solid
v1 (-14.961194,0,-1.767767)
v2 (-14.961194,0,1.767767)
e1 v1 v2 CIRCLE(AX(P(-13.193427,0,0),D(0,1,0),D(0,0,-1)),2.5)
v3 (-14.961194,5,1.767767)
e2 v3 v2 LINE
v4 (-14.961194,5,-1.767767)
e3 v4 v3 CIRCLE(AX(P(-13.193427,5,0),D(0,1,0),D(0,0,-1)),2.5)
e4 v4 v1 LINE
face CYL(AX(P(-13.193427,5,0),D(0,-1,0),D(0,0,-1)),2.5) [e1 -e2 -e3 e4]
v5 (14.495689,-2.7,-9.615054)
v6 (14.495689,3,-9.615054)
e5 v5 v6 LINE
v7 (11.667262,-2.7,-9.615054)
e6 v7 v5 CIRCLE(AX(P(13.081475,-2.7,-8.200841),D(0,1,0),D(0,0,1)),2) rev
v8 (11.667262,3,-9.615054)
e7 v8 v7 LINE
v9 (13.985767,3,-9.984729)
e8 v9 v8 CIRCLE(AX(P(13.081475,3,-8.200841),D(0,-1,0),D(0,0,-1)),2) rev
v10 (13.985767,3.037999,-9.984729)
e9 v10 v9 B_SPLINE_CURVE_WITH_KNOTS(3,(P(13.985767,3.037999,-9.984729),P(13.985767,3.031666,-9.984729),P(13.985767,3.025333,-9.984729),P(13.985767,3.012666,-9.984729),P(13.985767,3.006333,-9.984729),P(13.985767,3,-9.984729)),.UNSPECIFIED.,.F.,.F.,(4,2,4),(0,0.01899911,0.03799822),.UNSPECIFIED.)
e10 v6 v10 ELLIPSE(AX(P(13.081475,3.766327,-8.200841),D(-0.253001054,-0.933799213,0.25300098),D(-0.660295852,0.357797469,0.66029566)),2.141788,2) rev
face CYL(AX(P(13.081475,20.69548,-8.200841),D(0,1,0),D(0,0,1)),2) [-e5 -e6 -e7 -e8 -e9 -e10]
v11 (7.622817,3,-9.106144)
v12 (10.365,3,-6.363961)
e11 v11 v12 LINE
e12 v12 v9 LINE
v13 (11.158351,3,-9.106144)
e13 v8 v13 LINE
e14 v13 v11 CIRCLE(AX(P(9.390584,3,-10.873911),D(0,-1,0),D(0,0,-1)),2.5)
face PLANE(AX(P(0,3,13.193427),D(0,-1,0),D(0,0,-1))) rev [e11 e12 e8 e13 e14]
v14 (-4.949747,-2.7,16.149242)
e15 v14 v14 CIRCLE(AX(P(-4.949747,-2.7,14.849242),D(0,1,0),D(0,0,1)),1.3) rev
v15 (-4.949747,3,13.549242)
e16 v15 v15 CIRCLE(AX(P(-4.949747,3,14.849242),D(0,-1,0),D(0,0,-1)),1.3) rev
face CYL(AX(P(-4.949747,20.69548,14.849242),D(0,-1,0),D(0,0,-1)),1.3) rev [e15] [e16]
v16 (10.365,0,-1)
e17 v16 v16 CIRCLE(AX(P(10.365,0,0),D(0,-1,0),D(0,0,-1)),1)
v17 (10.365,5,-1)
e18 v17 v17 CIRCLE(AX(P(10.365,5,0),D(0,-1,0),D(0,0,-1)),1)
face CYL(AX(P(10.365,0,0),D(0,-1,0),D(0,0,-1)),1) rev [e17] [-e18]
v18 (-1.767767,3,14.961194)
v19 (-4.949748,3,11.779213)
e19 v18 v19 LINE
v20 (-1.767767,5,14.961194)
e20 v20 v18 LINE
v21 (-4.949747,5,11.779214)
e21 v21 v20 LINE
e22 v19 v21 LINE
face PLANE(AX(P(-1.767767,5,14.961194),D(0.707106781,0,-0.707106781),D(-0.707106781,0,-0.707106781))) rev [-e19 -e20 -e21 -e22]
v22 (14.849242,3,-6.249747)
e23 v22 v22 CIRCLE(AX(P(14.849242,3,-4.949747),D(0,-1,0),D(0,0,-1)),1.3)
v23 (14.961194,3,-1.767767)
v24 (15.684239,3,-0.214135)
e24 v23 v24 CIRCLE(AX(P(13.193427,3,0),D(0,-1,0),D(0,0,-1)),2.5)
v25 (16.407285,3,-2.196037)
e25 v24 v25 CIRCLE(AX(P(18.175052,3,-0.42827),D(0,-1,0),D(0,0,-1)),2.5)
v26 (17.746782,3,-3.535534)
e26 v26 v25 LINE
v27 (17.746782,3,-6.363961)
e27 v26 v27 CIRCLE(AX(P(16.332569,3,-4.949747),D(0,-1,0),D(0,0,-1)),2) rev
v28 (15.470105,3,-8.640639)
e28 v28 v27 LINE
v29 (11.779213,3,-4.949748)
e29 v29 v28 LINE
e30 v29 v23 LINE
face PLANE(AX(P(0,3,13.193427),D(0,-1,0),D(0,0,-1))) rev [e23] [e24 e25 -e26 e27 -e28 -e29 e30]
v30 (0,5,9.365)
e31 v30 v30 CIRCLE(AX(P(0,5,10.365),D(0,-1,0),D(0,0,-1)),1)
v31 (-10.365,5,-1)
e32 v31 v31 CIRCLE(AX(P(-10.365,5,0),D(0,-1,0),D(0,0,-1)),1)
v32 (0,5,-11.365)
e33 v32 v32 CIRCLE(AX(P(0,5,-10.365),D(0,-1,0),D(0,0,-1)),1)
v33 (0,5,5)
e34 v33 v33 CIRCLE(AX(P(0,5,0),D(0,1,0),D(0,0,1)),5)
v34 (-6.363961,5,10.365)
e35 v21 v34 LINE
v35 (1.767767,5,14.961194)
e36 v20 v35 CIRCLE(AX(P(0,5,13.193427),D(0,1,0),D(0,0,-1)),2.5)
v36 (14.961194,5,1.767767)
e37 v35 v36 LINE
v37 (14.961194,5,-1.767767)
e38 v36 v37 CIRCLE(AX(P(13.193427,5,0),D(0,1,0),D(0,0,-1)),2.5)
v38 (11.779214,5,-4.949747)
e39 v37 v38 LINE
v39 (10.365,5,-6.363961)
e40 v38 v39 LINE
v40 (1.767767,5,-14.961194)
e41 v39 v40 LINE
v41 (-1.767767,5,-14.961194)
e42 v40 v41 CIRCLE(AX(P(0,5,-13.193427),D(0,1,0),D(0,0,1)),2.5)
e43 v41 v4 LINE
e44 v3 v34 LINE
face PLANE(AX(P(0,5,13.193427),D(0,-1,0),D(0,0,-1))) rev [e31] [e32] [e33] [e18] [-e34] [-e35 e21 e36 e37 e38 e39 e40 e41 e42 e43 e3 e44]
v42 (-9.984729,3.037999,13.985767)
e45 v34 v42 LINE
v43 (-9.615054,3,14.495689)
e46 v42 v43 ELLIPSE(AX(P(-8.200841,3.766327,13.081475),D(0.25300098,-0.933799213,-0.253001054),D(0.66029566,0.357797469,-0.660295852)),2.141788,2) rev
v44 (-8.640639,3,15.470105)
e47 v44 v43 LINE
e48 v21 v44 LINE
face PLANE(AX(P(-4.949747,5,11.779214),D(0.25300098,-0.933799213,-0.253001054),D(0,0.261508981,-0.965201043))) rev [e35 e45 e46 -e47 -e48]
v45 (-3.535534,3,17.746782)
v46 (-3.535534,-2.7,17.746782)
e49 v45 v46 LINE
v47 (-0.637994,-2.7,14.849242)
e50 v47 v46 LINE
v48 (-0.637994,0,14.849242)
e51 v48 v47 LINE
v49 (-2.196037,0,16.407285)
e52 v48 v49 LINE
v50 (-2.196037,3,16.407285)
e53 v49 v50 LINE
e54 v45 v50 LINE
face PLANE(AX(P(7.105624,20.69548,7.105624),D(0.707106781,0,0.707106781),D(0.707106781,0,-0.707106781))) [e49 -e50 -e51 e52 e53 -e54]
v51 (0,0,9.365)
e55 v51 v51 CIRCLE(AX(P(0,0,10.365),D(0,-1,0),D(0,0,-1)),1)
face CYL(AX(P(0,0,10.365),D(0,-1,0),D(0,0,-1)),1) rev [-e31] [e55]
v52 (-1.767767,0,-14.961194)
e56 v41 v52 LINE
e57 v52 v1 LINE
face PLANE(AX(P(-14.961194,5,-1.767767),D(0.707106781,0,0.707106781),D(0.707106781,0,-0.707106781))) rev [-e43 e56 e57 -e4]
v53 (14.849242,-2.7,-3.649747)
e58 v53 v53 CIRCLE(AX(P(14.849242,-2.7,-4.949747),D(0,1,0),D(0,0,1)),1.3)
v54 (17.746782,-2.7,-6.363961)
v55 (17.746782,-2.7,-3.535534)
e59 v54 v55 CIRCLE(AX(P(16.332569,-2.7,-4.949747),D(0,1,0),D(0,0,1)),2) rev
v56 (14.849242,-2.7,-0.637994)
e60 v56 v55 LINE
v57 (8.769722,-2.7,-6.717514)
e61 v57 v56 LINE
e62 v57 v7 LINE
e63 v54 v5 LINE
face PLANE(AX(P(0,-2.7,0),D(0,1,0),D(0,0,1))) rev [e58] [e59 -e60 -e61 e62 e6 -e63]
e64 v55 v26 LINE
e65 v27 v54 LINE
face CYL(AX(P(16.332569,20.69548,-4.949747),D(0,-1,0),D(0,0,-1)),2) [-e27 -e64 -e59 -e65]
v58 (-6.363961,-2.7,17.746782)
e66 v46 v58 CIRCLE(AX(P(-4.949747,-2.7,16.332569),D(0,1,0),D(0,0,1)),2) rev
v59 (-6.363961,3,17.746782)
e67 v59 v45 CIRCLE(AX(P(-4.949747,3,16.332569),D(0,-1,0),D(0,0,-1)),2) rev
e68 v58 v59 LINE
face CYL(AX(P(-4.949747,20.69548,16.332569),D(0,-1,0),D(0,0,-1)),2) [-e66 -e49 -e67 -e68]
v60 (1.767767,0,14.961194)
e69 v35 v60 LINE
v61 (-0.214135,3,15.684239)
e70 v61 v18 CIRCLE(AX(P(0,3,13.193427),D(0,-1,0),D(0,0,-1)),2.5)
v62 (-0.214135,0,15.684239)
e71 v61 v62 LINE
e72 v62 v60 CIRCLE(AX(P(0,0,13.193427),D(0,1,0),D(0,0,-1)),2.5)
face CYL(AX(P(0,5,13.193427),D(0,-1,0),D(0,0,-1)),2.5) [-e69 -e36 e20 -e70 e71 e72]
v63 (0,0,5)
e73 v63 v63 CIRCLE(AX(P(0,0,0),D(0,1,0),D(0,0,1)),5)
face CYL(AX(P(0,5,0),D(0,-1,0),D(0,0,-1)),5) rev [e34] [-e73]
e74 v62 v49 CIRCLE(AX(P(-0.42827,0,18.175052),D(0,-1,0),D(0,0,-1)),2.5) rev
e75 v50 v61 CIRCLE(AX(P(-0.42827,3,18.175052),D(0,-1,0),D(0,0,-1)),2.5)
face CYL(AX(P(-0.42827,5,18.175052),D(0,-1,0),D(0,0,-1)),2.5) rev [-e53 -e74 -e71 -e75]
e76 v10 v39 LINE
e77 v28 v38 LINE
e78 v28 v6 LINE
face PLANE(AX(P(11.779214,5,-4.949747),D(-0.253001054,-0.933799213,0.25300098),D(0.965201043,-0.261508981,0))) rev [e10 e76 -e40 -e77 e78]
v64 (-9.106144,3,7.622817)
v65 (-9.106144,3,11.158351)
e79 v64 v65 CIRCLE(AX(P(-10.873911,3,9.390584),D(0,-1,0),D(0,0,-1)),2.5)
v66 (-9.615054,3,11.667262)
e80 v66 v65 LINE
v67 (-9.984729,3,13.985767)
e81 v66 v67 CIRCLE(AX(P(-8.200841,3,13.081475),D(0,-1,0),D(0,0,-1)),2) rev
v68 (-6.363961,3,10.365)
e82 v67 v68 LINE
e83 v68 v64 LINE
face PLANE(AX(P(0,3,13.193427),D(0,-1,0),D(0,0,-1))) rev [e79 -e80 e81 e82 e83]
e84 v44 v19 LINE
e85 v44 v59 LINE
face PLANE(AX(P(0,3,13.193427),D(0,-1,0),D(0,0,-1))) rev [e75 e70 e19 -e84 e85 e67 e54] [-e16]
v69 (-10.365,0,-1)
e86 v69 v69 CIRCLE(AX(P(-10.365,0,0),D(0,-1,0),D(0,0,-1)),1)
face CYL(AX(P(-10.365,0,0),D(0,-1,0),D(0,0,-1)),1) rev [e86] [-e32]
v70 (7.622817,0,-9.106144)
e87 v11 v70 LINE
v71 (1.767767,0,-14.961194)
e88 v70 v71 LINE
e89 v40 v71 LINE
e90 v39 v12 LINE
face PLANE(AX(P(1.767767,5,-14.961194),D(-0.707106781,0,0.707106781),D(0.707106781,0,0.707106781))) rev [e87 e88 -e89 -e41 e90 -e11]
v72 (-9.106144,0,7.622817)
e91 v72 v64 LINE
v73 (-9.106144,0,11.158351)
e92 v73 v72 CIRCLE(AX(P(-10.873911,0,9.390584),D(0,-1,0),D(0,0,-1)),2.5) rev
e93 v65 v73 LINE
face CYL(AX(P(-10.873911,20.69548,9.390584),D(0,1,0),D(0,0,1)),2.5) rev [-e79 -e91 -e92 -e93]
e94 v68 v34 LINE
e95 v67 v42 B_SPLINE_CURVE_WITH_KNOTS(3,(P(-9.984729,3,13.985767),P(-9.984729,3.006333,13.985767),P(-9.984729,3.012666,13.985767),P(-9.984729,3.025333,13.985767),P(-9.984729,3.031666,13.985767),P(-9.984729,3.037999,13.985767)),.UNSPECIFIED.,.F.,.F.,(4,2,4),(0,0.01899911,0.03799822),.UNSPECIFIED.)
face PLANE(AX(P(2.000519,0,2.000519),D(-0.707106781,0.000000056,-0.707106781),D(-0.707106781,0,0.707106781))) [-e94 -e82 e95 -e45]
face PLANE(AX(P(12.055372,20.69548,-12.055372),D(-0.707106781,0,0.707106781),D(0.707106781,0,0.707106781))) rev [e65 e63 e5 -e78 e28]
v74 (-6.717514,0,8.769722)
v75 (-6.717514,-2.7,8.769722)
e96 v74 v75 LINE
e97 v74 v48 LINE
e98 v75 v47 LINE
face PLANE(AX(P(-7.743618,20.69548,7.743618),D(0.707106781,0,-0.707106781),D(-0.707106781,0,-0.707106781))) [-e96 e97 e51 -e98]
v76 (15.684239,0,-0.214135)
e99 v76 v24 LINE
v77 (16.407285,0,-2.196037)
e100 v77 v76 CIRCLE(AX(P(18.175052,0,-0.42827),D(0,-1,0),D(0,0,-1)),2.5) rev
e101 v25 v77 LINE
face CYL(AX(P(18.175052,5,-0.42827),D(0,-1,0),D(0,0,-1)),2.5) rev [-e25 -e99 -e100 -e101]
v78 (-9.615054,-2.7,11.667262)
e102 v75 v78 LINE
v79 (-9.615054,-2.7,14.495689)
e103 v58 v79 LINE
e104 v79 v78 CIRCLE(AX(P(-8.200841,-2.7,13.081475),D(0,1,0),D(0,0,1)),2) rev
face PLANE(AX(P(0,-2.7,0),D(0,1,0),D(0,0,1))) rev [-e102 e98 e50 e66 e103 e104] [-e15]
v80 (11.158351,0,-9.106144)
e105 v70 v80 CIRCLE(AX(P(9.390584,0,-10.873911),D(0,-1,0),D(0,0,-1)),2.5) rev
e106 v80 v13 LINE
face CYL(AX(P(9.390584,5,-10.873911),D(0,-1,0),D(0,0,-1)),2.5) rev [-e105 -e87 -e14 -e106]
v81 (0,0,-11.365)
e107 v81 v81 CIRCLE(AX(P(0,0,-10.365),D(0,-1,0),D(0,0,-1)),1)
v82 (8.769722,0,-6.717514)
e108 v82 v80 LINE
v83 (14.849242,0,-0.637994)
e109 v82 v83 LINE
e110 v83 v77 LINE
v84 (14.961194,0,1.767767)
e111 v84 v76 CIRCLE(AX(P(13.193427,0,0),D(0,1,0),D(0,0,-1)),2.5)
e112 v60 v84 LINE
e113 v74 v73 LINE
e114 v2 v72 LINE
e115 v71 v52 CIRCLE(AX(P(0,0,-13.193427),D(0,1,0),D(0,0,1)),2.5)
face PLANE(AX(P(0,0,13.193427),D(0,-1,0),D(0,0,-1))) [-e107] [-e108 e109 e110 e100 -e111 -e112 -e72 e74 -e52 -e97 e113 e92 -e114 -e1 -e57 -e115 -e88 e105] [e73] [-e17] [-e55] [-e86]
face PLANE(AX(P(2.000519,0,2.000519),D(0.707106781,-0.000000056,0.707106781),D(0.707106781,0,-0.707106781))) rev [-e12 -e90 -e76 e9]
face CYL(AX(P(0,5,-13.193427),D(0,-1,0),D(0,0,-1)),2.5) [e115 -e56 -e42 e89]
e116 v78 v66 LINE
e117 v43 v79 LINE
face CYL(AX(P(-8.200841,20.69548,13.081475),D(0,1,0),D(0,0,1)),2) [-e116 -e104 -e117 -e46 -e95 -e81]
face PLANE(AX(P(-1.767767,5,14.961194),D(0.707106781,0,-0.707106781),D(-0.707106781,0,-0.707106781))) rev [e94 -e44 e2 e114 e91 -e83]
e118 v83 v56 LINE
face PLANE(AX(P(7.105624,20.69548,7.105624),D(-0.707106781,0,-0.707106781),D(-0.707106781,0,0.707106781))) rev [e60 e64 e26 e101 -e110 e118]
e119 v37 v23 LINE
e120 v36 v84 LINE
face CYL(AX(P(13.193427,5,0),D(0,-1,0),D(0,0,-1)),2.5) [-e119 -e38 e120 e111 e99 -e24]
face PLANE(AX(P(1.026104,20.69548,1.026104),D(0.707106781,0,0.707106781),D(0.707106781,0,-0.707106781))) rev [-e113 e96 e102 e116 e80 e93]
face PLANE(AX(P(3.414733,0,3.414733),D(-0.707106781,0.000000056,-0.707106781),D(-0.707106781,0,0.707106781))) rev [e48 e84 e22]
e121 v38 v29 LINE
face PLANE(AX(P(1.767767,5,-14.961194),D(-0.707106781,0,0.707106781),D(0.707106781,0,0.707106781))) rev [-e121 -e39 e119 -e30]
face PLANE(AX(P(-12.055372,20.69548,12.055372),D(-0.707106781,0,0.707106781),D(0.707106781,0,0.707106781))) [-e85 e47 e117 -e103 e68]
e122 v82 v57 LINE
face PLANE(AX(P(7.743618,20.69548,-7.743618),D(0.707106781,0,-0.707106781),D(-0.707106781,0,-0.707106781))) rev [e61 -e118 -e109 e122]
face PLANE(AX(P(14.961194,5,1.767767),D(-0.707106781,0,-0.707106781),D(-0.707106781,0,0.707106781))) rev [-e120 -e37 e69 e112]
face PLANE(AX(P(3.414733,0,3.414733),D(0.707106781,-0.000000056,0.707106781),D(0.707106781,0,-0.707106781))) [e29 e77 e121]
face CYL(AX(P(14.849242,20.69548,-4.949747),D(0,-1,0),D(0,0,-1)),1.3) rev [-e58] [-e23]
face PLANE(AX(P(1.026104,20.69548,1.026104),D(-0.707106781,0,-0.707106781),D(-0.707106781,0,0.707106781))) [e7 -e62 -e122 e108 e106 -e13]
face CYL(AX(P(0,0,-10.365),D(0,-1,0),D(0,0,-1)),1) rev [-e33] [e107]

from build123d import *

# Parameters (mm, degrees)
SKETCH1_R                 = 0.5
SKETCH1_R_2               = 5
BOSS_EXTRUDE1_DEPTH       = 5
SKETCH3_R                 = 1.3
BOSS_EXTRUDE4_DEPTH       = 5.7
BOSS_EXTRUDE6_DEPTH       = 1
FILLET1_R                 = 2.5
FILLET2_R                 = 2
F_2_0MM_DOWEL_HOLE1_D     = 2
F_2_0MM_DOWEL_HOLE1_DEPTH = 42.93
F_2_0MM_DOWEL_HOLE1_TIP   = 0.600860619


with BuildPart() as part:
    # Sketch1 → Boss-Extrude1 (new body)
    with BuildSketch(Plane(origin=(0, 0, 0), x_dir=(1, 0, 0), z_dir=(0, 1, 0))):
        with BuildLine():
            Line((1.767766953, 14.961194078), (14.961194078, 1.767766953))
            ThreePointArc((14.961194078, 1.767766953), (15.693427125, 0), (14.961194078, -1.767766953))
            Line((14.961194078, -1.767766953), (1.767766953, -14.961194078))
            ThreePointArc((1.767766953, -14.961194078), (0, -15.693427125), (-1.767766953, -14.961194078))
            Line((-1.767766953, -14.961194078), (-14.961194078, -1.767766953))
            ThreePointArc((-14.961194078, -1.767766953), (-15.693427125, 0), (-14.961194078, 1.767766953))
            Line((-14.961194078, 1.767766953), (-1.767766953, 14.961194078))
            ThreePointArc((-1.767766953, 14.961194078), (0, 15.693427125), (1.767766953, 14.961194078))
        make_face()
        with Locations(Location((0, 10.365, 0), (0, 0, 270))):
            Circle(SKETCH1_R, mode=Mode.SUBTRACT)
        with Locations(Location((0, -10.365, 0), (0, 0, 270))):
            Circle(SKETCH1_R, mode=Mode.SUBTRACT)
        with Locations(Location((10.365, 0, 0), (0, 0, 270))):
            Circle(SKETCH1_R, mode=Mode.SUBTRACT)
        with Locations(Location((-10.365, 0, 0), (0, 0, 270))):
            Circle(SKETCH1_R, mode=Mode.SUBTRACT)
        with Locations(Location((0, 0, 0), (0, 0, 270))):
            Circle(SKETCH1_R_2, mode=Mode.SUBTRACT)
    extrude(amount=BOSS_EXTRUDE1_DEPTH)

    # Sketch3 → Boss-Extrude4 (add)
    # profile 1 of 4: a face of its own
    with BuildSketch(Plane(origin=(0, -2.7, 0), x_dir=(1, 0, 0), z_dir=(0, 1, 0))):
        Polygon((-4.949747468, -10.537489101), (-0.637994164, -14.849242405), (-4.949747468, -19.160995709), (-9.261500772, -14.849242405), align=None)
        with Locations(Location((-4.949747468, -14.849242405, 0), (0, 0, 90))):
            Circle(SKETCH3_R, mode=Mode.SUBTRACT)
    # profile 2 of 4: a face of its own
    with BuildSketch(Plane(origin=(0, -2.7, 0), x_dir=(1, 0, 0), z_dir=(0, 1, 0))):
        Polygon((-6.717514421, -8.769722148), (-11.029267725, -13.081475452), (-9.261500772, -14.849242405), (-4.949747468, -10.537489101), align=None)
    # profile 3 of 4: a face of its own
    with BuildSketch(Plane(origin=(0, -2.7, 0), x_dir=(1, 0, 0), z_dir=(0, 1, 0))):
        Polygon((19.160995709, 4.949747468), (14.849242405, 9.261500772), (10.537489101, 4.949747468), (14.849242405, 0.637994164), align=None)
        with Locations(Location((14.849242405, 4.949747468, 0), (0, 0, 90))):
            Circle(SKETCH3_R, mode=Mode.SUBTRACT)
    # profile 4 of 4: a face of its own
    with BuildSketch(Plane(origin=(0, -2.7, 0), x_dir=(1, 0, 0), z_dir=(0, 1, 0))):
        Polygon((13.081475452, 11.029267725), (14.849242405, 9.261500772), (10.537489101, 4.949747468), (8.769722148, 6.717514421), align=None)
    extrude(amount=BOSS_EXTRUDE4_DEPTH)


with BuildPart() as boss_extrude6_tool:
    # Sketch7 → Boss-Extrude6 (new, symmetric)
    with BuildSketch(Plane(origin=(2.707626069, -2.13e-07, 2.707626069), x_dir=(0.7071067811865474, 0, -0.7071067811865478), z_dir=(0.7071067811865467, -5.5755039757469385e-08, 0.7071067811865462))):
        Polygon((11.829161787, 5.00000052), (17.04887, 3.00000056), (11.829161787, 3.00000052), align=None)
        Polygon((-11.829161787, 5.00000052), (-17.04887, 3.00000056), (-11.829161787, 3.00000052), align=None)
    extrude(amount=BOSS_EXTRUDE6_DEPTH, both=True)


with BuildPart() as part_1:
    add(part.part)


with BuildPart() as part_2:
    # Boss-Extrude6: joined with boss_extrude6_tool
    add(part_1.part.fuse(boss_extrude6_tool.part, tol=0.00001))

    # Fillet1
    fillet1_edges = [part_2.edges().sort_by_distance(p)[0] for p in [
        (-7.338376652, 1.5, 9.390584379),
        (-1.184018869, 1.5, 15.395267109),
        (9.390584379, 1.5, -7.338376652),
        (15.395267109, 1.5, -1.184018869),
    ]]
    fillet(fillet1_edges, radius=FILLET1_R)

    # Fillet2
    # the kernel refuses this fillet: 2 mm, written as the material it takes off along each edge
    with BuildSketch(Plane(origin=(-4.949747468, -7.7, 19.160995709), x_dir=(-0.7071067811865471, 0, -0.707106781186548), z_dir=(0, 1, 0)), Plane(origin=(13.081475452, -7.7, -11.029267725), x_dir=(0.7071067811865476, 0, 0.7071067811865476), z_dir=(0, 1, 0))) as fillet2_piece_1:
        with BuildLine():
            CenterArc((FILLET2_R, -FILLET2_R), FILLET2_R, 90, 90)
            Line((0, -FILLET2_R), (0, 0))
            Line((0, 0), (FILLET2_R, 0))
        make_face()
    extrude(amount=15.7, mode=Mode.SUBTRACT)
    with BuildSketch(Plane(origin=(-11.029267725, -7.7, 13.081475452), x_dir=(0.707106781186547, 0, 0.7071067811865479), z_dir=(0, 1, 0)), Plane(origin=(19.160995709, -7.7, -4.949747468), x_dir=(-0.7071067811865482, 0, -0.7071067811865469), z_dir=(0, 1, 0))) as fillet2_piece_2:
        with BuildLine():
            CenterArc((FILLET2_R, FILLET2_R), FILLET2_R, 180, 90)
            Line((0, FILLET2_R), (0, 0))
            Line((0, 0), (FILLET2_R, 0))
        make_face()
    extrude(amount=15.7, mode=Mode.SUBTRACT)

    # Ø2.0mm Dowel Hole1
    with Locations(Plane.XZ):
        with Locations((0, 10.365), (10.365, 0), (-10.365, 0), (0, -10.365)):
            Hole(F_2_0MM_DOWEL_HOLE1_D / 2, depth=F_2_0MM_DOWEL_HOLE1_DEPTH)
            with Locations((0, 0, -(F_2_0MM_DOWEL_HOLE1_DEPTH + F_2_0MM_DOWEL_HOLE1_TIP / 2))):  # 118° drill point
                Cone(0, F_2_0MM_DOWEL_HOLE1_D / 2, F_2_0MM_DOWEL_HOLE1_TIP, mode=Mode.SUBTRACT)


solid = part_2.part
